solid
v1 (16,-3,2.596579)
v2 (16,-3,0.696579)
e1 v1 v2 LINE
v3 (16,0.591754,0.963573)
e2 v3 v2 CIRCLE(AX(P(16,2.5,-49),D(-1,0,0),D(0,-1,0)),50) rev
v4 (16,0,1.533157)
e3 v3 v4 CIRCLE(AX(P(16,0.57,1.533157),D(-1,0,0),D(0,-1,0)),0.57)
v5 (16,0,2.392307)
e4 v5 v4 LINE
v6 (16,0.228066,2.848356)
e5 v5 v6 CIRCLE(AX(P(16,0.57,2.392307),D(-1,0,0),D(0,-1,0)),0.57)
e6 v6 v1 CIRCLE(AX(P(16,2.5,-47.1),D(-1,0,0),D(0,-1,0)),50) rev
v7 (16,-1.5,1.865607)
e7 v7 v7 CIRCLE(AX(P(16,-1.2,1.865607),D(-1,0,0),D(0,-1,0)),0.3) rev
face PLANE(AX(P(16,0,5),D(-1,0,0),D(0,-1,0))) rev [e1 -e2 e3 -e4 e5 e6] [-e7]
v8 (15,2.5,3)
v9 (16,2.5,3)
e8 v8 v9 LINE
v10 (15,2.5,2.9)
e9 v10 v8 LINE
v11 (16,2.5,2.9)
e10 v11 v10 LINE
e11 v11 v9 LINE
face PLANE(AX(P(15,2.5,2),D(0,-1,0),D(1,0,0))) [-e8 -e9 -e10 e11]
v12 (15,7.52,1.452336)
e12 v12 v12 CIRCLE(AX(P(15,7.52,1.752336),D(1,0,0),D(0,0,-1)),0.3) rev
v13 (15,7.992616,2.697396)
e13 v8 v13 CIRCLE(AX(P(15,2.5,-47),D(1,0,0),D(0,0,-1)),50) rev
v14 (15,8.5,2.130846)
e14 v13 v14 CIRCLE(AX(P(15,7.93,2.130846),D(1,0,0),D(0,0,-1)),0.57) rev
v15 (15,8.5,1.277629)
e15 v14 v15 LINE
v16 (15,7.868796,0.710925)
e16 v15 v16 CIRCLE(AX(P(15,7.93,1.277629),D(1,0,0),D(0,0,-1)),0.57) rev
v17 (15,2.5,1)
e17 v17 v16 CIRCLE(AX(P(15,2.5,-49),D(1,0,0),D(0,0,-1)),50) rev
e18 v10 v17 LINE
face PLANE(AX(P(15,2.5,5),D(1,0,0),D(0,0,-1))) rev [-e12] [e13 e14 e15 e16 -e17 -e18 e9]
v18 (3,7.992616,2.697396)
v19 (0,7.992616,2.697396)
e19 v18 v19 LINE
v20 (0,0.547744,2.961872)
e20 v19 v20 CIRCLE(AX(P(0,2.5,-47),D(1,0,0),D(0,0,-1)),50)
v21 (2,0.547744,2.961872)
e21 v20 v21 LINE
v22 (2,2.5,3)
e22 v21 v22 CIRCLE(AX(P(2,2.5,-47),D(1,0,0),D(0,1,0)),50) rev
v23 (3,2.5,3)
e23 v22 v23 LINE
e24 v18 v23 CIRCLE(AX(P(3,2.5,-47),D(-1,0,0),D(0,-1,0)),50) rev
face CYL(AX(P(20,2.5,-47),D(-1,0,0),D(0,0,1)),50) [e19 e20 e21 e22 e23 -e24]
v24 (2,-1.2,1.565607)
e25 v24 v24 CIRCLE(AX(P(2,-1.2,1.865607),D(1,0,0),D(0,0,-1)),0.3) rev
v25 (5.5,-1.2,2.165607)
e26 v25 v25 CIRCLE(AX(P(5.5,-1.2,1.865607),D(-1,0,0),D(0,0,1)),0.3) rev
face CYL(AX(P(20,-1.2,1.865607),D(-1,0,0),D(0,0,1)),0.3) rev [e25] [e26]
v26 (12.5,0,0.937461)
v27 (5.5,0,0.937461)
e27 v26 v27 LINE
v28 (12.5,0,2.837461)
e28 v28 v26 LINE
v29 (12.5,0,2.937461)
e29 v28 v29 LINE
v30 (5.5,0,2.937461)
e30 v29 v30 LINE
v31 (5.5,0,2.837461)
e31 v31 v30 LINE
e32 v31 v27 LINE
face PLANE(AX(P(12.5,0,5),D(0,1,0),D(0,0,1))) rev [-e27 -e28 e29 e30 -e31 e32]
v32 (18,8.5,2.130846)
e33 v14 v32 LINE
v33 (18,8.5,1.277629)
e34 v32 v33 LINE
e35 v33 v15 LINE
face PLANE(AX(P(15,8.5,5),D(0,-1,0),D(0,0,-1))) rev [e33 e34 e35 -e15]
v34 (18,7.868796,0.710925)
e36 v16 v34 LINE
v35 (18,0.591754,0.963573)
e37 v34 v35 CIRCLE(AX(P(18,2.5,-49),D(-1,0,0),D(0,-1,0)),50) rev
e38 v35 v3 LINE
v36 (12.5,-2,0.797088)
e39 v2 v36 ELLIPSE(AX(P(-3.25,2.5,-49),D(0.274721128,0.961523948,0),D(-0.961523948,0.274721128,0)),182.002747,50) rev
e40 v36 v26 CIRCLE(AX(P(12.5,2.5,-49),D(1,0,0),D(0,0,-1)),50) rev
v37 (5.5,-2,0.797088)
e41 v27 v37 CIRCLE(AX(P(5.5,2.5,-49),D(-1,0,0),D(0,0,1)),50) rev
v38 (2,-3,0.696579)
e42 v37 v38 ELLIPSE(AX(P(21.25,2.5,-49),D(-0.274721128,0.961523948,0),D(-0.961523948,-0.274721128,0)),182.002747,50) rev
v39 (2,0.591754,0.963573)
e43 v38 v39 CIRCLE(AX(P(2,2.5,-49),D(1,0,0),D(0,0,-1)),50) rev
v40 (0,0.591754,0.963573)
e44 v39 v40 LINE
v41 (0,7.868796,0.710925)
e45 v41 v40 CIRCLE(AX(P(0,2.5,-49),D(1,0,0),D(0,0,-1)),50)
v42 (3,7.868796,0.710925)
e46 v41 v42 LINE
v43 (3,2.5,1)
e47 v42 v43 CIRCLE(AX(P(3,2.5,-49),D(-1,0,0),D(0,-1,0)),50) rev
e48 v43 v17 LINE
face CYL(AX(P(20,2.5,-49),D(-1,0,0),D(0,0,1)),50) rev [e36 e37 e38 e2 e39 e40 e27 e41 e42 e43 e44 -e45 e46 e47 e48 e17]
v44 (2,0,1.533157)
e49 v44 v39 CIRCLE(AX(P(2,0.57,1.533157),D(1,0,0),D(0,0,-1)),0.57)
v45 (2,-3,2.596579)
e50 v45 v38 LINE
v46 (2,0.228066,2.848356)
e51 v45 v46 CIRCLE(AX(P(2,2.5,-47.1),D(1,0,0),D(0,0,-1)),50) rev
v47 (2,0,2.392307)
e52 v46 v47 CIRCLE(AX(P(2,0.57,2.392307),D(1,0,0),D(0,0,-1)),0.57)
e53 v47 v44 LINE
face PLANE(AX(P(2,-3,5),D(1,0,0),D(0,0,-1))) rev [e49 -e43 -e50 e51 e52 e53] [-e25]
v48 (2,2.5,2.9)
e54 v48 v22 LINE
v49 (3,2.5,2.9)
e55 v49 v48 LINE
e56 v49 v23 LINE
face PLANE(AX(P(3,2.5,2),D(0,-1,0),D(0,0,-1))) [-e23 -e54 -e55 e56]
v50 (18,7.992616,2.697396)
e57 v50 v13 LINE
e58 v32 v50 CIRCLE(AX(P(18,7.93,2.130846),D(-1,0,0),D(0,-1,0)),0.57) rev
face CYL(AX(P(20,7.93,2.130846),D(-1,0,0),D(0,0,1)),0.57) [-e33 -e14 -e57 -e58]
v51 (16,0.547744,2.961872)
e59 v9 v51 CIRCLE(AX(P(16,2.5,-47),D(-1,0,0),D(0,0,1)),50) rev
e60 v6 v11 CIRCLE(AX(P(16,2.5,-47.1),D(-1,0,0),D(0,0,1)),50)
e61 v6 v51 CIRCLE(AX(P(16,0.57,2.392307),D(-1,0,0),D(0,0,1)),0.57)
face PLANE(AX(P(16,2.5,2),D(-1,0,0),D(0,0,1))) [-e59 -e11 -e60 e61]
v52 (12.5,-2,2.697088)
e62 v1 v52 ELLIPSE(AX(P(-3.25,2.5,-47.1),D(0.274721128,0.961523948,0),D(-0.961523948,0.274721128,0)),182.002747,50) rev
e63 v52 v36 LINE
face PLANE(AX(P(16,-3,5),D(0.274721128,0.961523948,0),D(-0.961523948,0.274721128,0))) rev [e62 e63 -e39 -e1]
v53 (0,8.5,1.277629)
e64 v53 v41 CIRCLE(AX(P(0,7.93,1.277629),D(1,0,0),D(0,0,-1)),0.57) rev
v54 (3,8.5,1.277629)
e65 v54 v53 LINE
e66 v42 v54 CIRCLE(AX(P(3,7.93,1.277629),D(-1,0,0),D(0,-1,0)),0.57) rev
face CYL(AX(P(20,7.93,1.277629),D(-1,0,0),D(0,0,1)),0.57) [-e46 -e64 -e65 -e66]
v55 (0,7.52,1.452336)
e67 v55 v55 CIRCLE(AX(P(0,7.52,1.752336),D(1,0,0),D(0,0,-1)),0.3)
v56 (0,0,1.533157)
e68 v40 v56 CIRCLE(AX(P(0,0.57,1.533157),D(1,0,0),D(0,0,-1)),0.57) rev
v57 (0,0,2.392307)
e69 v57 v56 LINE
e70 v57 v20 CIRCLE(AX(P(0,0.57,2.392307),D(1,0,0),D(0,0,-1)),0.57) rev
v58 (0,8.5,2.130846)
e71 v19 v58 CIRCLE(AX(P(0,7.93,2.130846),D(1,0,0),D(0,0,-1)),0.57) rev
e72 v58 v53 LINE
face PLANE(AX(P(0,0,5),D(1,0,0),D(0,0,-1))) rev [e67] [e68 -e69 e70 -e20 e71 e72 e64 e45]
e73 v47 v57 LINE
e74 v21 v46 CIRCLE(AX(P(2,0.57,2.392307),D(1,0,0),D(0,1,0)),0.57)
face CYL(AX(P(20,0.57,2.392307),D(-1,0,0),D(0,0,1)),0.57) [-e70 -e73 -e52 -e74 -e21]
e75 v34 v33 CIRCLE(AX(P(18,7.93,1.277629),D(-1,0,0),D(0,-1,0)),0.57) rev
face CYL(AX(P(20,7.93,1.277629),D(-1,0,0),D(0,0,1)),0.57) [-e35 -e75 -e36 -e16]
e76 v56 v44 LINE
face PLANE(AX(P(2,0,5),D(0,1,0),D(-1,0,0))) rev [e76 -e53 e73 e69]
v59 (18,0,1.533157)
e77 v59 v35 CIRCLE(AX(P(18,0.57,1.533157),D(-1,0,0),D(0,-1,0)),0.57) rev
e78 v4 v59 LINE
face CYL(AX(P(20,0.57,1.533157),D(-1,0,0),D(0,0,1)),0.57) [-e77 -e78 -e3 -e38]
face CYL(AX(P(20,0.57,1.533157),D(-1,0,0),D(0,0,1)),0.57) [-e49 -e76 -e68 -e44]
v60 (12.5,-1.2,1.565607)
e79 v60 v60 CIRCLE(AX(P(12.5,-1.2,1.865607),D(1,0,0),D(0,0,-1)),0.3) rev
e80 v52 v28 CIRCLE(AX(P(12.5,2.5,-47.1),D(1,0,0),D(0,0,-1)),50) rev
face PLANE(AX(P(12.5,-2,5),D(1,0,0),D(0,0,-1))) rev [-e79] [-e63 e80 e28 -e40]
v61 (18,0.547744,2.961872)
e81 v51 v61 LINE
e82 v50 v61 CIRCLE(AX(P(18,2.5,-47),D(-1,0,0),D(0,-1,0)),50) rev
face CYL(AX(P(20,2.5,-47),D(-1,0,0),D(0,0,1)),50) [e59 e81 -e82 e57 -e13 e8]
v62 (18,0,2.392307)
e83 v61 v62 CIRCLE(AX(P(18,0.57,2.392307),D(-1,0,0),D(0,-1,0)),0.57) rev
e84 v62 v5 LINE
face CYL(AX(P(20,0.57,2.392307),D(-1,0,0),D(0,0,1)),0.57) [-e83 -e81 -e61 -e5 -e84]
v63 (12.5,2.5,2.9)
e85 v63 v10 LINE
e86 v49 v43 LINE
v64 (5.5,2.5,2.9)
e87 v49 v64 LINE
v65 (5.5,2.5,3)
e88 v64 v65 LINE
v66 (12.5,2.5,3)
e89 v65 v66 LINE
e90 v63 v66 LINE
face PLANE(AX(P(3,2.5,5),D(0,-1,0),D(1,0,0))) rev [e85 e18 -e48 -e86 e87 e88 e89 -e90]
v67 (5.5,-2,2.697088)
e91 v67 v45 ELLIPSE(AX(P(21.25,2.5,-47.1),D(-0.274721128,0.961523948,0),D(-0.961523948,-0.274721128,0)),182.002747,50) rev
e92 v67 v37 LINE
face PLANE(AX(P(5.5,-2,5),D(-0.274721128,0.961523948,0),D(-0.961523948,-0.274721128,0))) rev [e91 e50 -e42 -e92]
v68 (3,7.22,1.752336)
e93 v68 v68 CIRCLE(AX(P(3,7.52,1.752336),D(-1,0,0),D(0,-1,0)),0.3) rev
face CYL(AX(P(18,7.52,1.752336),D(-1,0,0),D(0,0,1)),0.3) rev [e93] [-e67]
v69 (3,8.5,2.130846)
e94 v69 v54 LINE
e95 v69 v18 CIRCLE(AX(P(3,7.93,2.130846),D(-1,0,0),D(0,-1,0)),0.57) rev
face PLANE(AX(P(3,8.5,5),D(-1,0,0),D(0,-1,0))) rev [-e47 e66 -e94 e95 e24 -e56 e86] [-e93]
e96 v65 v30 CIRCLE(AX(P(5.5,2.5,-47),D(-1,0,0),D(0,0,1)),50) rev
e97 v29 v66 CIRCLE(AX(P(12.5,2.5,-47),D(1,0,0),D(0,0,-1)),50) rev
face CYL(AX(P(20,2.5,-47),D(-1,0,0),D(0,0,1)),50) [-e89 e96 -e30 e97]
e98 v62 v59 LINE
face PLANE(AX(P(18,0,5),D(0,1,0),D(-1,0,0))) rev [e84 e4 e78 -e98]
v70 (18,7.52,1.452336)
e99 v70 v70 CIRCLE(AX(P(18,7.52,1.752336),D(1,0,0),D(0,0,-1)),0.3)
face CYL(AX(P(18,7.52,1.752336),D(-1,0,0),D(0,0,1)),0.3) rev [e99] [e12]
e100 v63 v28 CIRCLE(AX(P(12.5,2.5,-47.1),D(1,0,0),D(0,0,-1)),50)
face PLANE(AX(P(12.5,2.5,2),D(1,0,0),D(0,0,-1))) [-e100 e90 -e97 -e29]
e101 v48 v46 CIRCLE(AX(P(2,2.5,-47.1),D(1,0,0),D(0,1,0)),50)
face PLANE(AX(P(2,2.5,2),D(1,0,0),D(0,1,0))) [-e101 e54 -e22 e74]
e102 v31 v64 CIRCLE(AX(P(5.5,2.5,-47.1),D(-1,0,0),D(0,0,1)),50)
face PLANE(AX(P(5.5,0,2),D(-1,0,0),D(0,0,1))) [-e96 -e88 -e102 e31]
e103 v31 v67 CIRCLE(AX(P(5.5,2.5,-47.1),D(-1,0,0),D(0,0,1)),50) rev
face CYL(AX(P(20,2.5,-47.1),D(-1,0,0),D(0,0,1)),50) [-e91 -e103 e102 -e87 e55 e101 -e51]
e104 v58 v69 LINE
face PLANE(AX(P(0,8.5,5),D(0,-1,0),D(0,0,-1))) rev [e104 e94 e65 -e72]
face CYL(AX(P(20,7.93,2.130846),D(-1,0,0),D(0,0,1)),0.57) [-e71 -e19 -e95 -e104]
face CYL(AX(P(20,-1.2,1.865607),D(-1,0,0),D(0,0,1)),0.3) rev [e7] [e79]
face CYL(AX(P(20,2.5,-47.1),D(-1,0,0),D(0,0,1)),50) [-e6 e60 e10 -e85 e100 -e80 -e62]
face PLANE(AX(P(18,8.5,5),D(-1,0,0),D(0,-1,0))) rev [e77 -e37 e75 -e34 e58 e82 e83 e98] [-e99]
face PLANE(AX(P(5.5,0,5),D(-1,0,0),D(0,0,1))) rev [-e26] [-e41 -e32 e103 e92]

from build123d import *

# Parameters (mm, degrees)
BOSS_EXTRUDE2_DEPTH = 5
SKETCH8_R           = 50
CUT_EXTRUDE6_DEPTH  = 20
SKETCH9_OUTSIDE_W   = 10.721
SKETCH9_OUTSIDE_H   = 17.86
SKETCH9_OUTSIDE_R   = 50
CUT_EXTRUDE7_DEPTH  = 20
SKETCH11_W          = 7
SKETCH11_H          = 2.5
BOSS_EXTRUDE4_DEPTH = 2
SKETCH12_OUTSIDE_W  = 9.685
SKETCH12_OUTSIDE_H  = 17.824
SKETCH12_OUTSIDE_R  = 50
CUT_EXTRUDE8_DEPTH  = 20
SKETCH13_R          = 0.3
CUT_EXTRUDE10_DEPTH = 21.130822139
SKETCH14_R          = 0.3
CUT_EXTRUDE11_DEPTH = 20
FILLET1_R           = 0.57


with BuildPart() as part:
    # Sketch1 → Boss-Extrude2 (new body)
    with BuildSketch(Plane.XY):
        Polygon((0, 0), (0, 8.5), (3, 8.5), (3, 2.5), (15, 2.5), (15, 8.5), (18, 8.5), (18, 0), (16, 0), (16, -3), (12.5, -2), (12.5, 0), (5.5, 0), (5.5, -2), (2, -3), (2, 0), align=None)
    extrude(amount=BOSS_EXTRUDE2_DEPTH)

    # Sketch8 → Cut-Extrude6 (cut)
    with BuildSketch(Plane(origin=(0, 0, 0), x_dir=(0, 0, -1), z_dir=(1, 0, 0))):
        with Locations((49, 2.5)):
            Circle(SKETCH8_R)
    extrude(amount=CUT_EXTRUDE6_DEPTH, mode=Mode.SUBTRACT)

    # Sketch9 outside → Cut-Extrude7 (cut)
    with BuildSketch(Plane(origin=(0, 0, 0), x_dir=(0, 0, -1), z_dir=(1, 0, 0))):
        with Locations((-2.8195, 2.75)):
            Rectangle(SKETCH9_OUTSIDE_W, SKETCH9_OUTSIDE_H)
        with Locations((47.1, 2.5)):
            Circle(SKETCH9_OUTSIDE_R, mode=Mode.SUBTRACT)
    extrude(amount=CUT_EXTRUDE7_DEPTH, mode=Mode.SUBTRACT)

    # Sketch11 → Boss-Extrude4 (add)
    with BuildSketch(Plane.XY.offset(4)):
        Polygon((0, 0), (0, 8.5), (3, 8.5), (3, 2.5), (2, 2.5), (2, 0), align=None)
        with Locations((9, 1.25)):
            Rectangle(SKETCH11_W, SKETCH11_H)
        Polygon((18, 8.5), (15, 8.5), (15, 2.5), (16, 2.5), (16, 0), (18, 0), align=None)
    extrude(amount=-BOSS_EXTRUDE4_DEPTH)

    # Sketch12 outside → Cut-Extrude8 (cut)
    with BuildSketch(Plane(origin=(0, 0, 0), x_dir=(0, 0, -1), z_dir=(1, 0, 0))):
        with Locations((-2.3195, 2.75)):
            Rectangle(SKETCH12_OUTSIDE_W, SKETCH12_OUTSIDE_H)
        with Locations((47, 2.5)):
            Circle(SKETCH12_OUTSIDE_R, mode=Mode.SUBTRACT)
    extrude(amount=CUT_EXTRUDE8_DEPTH, mode=Mode.SUBTRACT)

    # Sketch13 → Cut-Extrude10 (cut, through all)
    with BuildSketch(Plane(origin=(0, 0, 0), x_dir=(0, 0, -1), z_dir=(1, 0, 0))):
        with Locations(Location((-1.752335907, 7.52, 0), (0, 0, 270))):
            Circle(SKETCH13_R)
    extrude(amount=CUT_EXTRUDE10_DEPTH, mode=Mode.SUBTRACT)

    # Sketch14 → Cut-Extrude11 (cut)
    with BuildSketch(Plane(origin=(0, 0, 0), x_dir=(0, 0, -1), z_dir=(1, 0, 0))):
        with Locations(Location((-1.865607241, -1.2, 0), (0, 0, 270))):
            Circle(SKETCH14_R)
    extrude(amount=CUT_EXTRUDE11_DEPTH, mode=Mode.SUBTRACT)

    # Fillet1
    # the kernel refuses this fillet: 0.57 mm, written as the material it takes off along each edge
    with BuildSketch(Plane(origin=(4.276921505, 8.5, 2.638694584), x_dir=(0, 0, -1), z_dir=(-1, 0, 0)), Plane(origin=(19.276921505, 8.5, 2.638694584), x_dir=(0, 0, -1), z_dir=(-1, 0, 0))) as fillet1_piece_1:
        with BuildLine():
            CenterArc((0.507848876, 0.57), FILLET1_R, 186.30680233, 83.69319767)
            ThreePointArc((-0.058701439, 0.50738418), (-0.029998613, 0.253617132), (0, 0))
            Line((0, 0), (0.507848876, 0))
        make_face()
    extrude(amount=5.553843009, mode=Mode.SUBTRACT)
    with BuildSketch(Plane(origin=(2, 0, 2.937460889), x_dir=(0, 0.9990083494707687, 0.0445232263845563), z_dir=(-1, 0, 0))) as fillet1_piece_2:
        with BuildLine():
            CenterArc((0.545162753, 0.569991432), FILLET1_R, 182.551836528, 87.762310927)
            Line((-0.024272006, 0.544613193), (0, 0))
            ThreePointArc((0, 0), (0.274143997, -0.000751555), (0.548287995, 0))
        make_face()
    extrude(amount=3.370719987, mode=Mode.SUBTRACT)
    with BuildSketch(Plane(origin=(19.370719987, 0, 2.937460889), x_dir=(0, 0, -1), z_dir=(-1, 0, 0))) as fillet1_piece_3:
        with BuildLine():
            CenterArc((0.545153795, -0.57), FILLET1_R, 90, 87.762310927)
            ThreePointArc((-0.024411551, -0.547744285), (-0.012956585, -0.273838681), (0, 0))
            Line((0, 0), (0.545153795, 0))
        make_face()
    extrude(amount=3.370719987, mode=Mode.SUBTRACT)
    with BuildSketch(Plane(origin=(2, 0, 0.937460889), x_dir=(0, 0.9990278617443559, 0.04408323330360469), z_dir=(-1, 0, 0)), Plane(origin=(19.489241357, 0, 0.937460889), x_dir=(0, 0.9990278617443559, 0.04408323330360409), z_dir=(-1, 0, 0))) as fillet1_piece_4:
        with BuildLine():
            CenterArc((0.595706111, -0.569990001), FILLET1_R, 90.339381978, 92.187220026)
            Line((0.02626023, -0.595117444), (0, 0))
            ThreePointArc((0, 0), (0.296164915, -0.000877144), (0.592329831, 0))
        make_face()
    extrude(amount=3.489241357, mode=Mode.SUBTRACT)
    with BuildSketch(Plane(origin=(4.59733659, 8.5, 0.638694584), x_dir=(0, 0, 1), z_dir=(-1, 0, 0))) as fillet1_piece_5:
        with BuildLine():
            CenterArc((0.638934636, -0.57), FILLET1_R, 90, 96.164070516)
            ThreePointArc((0.072230095, -0.631204271), (0.037117605, -0.315487411), (0, 0))
            Line((0, 0), (0.638934636, 0))
        make_face()
    extrude(amount=6.194673181, mode=Mode.SUBTRACT)
    with BuildSketch(Plane(origin=(19.59733659, 8.5, 0.638694584), x_dir=(0, -0.993516243777255, 0.1136902517841086), z_dir=(-1, 0, 0))) as fillet1_piece_6:
        with BuildLine():
            CenterArc((0.638944899, 0.569988496), FILLET1_R, 173.471913452, 96.164070516)
            Line((0.07264064, 0.63479194), (0, 0))
            ThreePointArc((0, 0), (0.317661777, 0.0010091), (0.635323554, 0))
        make_face()
    extrude(amount=6.194673181, mode=Mode.SUBTRACT)


solid = part.part
